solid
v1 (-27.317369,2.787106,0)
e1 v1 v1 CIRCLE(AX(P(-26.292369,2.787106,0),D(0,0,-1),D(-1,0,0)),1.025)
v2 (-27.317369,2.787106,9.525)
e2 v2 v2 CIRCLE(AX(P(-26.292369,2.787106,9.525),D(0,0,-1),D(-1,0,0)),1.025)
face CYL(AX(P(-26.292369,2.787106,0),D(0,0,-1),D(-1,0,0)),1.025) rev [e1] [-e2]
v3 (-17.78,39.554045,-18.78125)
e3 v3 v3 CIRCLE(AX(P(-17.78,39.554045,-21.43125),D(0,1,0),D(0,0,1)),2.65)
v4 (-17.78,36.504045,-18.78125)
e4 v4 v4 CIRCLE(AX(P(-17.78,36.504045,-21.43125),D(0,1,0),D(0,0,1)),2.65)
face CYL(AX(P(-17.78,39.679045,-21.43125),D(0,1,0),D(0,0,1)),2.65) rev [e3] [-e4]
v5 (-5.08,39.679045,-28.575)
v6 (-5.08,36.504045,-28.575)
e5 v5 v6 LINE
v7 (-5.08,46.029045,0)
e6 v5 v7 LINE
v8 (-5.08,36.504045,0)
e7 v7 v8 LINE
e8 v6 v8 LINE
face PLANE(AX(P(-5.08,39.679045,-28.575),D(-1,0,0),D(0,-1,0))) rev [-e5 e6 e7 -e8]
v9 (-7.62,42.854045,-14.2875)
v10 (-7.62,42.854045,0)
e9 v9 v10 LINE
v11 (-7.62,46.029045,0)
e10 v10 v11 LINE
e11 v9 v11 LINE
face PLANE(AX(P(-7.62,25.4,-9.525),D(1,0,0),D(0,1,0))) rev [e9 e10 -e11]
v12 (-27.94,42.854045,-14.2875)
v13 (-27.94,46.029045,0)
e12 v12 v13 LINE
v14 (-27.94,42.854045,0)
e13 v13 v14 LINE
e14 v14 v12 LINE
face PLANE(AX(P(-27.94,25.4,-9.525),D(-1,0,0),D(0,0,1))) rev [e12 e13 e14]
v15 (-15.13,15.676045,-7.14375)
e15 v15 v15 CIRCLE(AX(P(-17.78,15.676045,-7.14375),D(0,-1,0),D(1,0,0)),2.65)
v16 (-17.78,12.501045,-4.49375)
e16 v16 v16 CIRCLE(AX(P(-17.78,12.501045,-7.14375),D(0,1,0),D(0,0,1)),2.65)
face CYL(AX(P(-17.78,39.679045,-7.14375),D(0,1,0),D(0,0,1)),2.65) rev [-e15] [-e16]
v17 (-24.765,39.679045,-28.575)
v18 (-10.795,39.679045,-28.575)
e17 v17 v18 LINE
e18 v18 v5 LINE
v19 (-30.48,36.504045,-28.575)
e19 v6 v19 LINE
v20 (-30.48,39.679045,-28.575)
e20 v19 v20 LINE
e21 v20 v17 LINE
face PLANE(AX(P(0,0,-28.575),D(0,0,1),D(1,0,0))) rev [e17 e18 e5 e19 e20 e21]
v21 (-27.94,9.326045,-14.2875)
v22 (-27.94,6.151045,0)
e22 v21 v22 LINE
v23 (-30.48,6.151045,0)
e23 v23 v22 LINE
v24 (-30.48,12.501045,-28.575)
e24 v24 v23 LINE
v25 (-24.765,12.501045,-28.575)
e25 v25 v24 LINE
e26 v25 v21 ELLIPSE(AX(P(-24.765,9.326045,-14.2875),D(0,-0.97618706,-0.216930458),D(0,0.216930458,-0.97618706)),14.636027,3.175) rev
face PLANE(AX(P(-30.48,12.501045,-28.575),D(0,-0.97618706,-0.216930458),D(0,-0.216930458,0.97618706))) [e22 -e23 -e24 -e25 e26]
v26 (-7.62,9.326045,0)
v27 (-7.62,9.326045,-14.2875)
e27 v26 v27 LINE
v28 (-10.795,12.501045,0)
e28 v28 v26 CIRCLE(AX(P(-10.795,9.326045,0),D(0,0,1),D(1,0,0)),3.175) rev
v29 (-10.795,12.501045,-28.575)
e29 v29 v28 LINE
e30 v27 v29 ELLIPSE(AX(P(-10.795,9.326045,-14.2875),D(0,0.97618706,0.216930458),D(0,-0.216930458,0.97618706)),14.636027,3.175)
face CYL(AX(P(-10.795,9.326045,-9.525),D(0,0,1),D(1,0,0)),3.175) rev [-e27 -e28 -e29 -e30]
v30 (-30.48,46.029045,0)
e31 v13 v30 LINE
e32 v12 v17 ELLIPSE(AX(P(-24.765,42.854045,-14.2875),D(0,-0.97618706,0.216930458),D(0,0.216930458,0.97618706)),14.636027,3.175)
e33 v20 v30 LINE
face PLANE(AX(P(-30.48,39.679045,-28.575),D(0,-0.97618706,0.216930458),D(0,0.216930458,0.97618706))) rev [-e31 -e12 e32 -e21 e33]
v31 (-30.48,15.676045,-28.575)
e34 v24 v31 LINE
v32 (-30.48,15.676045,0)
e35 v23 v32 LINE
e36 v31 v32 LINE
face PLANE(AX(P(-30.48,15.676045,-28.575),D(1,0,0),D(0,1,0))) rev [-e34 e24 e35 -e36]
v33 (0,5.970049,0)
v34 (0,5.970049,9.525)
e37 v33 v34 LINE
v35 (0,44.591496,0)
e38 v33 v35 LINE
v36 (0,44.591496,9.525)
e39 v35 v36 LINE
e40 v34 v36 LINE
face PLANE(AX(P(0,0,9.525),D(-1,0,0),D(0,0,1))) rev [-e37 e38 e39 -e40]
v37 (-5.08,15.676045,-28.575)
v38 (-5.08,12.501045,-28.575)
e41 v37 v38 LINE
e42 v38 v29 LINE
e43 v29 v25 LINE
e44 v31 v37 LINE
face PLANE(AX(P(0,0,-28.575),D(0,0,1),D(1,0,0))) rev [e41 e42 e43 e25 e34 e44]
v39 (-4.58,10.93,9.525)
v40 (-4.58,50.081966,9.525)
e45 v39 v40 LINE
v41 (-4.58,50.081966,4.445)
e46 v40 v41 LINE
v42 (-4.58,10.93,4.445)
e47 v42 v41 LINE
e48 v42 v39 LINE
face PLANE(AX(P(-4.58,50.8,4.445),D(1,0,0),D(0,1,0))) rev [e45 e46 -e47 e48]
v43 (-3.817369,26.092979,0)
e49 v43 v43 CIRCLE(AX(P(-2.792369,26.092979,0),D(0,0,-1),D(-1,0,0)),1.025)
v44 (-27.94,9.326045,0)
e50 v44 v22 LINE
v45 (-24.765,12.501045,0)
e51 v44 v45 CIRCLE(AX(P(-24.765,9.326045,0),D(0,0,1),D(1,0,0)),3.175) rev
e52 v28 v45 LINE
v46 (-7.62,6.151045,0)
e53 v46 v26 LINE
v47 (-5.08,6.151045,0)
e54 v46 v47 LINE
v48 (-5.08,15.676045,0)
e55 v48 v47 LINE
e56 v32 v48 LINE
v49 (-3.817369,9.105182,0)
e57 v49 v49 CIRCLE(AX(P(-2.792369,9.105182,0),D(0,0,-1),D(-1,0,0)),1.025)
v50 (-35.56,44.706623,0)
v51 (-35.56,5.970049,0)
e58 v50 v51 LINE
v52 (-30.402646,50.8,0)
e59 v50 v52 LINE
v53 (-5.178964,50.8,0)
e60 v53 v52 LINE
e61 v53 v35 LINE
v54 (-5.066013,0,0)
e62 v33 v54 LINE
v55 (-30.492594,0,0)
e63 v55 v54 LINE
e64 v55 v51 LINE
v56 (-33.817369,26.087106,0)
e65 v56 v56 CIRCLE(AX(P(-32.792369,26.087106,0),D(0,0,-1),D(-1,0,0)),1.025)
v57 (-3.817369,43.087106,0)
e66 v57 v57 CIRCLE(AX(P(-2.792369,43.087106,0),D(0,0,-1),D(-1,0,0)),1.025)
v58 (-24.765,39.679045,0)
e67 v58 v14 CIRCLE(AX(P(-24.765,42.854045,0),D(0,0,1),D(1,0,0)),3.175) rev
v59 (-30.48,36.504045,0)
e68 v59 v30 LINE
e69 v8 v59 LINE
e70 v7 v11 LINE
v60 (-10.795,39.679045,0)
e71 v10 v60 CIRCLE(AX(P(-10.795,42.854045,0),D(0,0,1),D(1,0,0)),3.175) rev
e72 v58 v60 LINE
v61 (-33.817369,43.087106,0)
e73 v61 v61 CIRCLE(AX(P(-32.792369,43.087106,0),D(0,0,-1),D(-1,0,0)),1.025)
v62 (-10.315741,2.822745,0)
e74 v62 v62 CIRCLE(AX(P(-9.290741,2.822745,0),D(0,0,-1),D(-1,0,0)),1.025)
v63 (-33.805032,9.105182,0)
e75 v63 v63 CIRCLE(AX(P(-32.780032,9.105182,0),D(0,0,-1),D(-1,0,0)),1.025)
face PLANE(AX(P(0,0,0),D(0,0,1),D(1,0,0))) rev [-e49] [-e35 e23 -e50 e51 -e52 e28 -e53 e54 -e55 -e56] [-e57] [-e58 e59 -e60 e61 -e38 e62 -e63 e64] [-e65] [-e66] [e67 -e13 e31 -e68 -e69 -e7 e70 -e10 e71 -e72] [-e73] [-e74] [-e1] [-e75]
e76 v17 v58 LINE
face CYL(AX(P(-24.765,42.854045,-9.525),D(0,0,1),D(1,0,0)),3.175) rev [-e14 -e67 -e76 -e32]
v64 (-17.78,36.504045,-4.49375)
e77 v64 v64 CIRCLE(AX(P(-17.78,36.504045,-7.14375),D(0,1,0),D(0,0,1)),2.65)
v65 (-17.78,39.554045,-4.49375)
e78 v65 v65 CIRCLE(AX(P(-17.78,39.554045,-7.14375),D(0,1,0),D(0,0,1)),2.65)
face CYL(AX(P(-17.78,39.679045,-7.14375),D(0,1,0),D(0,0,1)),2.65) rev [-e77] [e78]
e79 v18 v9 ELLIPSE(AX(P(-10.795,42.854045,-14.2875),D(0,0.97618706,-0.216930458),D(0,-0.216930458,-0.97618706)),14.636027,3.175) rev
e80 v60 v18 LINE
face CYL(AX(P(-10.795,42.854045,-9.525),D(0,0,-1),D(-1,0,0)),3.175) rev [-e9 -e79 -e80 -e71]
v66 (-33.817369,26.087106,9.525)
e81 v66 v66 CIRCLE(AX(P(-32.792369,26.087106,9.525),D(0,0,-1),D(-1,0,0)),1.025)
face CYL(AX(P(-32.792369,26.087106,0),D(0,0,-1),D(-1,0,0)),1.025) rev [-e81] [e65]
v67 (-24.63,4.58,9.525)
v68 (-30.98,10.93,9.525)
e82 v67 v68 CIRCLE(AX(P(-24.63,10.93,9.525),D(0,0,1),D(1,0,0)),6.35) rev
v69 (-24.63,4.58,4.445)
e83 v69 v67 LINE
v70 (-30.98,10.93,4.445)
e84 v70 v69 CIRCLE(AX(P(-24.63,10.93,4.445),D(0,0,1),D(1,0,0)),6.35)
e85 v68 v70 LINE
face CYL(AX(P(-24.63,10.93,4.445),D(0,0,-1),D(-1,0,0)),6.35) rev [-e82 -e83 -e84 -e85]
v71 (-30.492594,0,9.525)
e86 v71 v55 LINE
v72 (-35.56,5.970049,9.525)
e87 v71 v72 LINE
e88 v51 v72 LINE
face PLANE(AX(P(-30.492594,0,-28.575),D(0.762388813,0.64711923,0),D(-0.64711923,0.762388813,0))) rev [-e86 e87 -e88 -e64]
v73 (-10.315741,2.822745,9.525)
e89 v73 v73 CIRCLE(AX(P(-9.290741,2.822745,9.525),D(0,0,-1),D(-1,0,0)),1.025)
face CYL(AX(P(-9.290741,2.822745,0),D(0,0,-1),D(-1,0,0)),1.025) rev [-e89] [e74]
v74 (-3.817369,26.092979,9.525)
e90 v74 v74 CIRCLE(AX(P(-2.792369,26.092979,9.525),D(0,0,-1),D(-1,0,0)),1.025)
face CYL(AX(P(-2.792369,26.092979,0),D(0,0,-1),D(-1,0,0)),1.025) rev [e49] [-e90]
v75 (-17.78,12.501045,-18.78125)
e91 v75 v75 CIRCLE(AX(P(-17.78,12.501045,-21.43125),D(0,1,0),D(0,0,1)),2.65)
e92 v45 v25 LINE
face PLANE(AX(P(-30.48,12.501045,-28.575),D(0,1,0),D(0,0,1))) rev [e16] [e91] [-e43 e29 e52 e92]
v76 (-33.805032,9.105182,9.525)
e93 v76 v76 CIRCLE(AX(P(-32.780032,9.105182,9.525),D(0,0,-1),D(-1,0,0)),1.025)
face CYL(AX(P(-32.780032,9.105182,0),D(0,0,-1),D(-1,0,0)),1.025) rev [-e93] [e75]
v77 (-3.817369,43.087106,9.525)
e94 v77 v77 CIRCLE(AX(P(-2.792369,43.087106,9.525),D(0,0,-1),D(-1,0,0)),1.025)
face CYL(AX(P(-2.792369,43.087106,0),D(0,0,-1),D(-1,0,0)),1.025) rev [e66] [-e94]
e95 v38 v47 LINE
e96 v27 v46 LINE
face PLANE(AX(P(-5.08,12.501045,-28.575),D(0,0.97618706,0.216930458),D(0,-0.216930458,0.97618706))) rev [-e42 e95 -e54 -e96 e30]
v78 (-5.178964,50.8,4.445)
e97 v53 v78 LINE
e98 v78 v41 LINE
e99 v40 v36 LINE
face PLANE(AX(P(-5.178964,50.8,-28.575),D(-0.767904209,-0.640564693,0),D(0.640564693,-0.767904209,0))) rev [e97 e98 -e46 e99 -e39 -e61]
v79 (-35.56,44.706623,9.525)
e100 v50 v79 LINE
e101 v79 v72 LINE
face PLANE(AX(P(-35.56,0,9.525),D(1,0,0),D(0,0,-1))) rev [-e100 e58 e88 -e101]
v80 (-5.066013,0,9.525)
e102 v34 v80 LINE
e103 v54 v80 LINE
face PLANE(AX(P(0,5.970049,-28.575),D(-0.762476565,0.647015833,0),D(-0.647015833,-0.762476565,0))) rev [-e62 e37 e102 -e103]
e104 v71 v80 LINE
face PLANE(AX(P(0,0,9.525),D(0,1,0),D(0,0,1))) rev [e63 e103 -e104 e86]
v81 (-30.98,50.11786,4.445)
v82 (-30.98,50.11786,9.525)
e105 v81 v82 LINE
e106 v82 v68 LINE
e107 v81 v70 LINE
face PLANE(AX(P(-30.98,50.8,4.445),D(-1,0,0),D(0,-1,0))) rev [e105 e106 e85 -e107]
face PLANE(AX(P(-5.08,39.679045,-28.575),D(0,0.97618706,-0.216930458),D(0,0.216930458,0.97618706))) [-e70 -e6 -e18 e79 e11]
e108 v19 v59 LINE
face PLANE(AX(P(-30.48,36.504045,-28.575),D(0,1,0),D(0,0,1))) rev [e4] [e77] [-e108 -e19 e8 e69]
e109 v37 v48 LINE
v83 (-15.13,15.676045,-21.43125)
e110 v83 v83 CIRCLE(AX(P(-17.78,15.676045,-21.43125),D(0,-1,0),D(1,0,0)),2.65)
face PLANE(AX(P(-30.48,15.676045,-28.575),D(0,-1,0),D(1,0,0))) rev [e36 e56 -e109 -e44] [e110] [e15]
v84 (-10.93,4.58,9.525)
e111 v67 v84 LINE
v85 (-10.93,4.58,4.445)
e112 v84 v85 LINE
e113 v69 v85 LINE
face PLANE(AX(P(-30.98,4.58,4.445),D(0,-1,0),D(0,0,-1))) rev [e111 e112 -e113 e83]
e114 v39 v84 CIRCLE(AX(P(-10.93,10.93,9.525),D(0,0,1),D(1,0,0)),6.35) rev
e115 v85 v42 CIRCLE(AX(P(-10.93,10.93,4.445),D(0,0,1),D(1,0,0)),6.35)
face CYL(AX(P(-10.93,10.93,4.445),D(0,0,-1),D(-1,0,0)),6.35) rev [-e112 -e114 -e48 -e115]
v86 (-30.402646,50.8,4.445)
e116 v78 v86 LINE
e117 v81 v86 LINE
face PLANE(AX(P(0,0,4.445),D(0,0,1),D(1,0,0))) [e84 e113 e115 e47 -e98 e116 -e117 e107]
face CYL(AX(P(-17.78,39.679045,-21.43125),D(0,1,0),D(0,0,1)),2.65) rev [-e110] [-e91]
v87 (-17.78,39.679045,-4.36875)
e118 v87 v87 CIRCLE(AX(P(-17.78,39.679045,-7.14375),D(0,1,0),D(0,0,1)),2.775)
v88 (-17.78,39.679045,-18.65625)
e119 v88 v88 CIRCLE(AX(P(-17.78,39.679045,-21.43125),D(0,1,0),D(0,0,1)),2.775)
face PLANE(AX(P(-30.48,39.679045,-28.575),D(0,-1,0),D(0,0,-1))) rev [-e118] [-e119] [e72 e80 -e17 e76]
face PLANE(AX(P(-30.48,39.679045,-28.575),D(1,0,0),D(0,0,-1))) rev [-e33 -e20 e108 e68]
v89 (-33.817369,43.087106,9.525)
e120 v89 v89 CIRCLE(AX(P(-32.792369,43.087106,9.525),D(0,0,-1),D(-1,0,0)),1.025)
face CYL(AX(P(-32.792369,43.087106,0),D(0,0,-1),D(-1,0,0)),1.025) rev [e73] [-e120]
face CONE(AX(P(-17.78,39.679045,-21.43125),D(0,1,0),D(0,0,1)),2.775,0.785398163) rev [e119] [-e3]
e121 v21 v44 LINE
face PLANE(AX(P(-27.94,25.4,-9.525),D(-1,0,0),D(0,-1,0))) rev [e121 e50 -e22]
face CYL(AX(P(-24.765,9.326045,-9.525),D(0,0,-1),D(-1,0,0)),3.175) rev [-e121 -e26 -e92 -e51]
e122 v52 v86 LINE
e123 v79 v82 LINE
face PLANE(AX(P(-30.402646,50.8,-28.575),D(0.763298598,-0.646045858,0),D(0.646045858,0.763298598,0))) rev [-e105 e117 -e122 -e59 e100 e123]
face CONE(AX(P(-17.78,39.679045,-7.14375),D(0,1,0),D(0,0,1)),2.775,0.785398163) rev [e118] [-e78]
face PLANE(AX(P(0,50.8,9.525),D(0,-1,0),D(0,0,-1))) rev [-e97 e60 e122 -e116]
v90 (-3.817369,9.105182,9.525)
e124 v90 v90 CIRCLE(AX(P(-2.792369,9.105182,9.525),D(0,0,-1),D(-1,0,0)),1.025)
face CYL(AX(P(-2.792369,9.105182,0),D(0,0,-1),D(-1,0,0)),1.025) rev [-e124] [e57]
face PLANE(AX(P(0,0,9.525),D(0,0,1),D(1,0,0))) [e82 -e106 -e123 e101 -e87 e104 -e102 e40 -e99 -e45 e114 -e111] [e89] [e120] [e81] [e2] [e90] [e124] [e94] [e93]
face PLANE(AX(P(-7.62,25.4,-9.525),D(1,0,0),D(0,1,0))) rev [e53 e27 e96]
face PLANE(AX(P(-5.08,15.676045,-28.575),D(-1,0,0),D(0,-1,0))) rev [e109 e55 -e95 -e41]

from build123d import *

# Parameters (mm, degrees)
SKETCH1_W                      = 35.56
SKETCH1_H                      = 50.8
BOSS_EXTRUDE1_DEPTH            = 9.525
SKETCH2_W                      = 26.4
SKETCH2_H                      = 46.22
CUT_EXTRUDE2_DEPTH             = 5.08
TAP_DRILL_FOR_M2_5X0_45_TAP1_D = 2.05
SKETCH13_W                     = 25.4
SKETCH13_H                     = 3.175
BOSS_EXTRUDE2_DEPTH            = 28.575
CUT_EXTRUDE3_DEPTH             = 73.778867812
FILLET1_R                      = 6.35
M5_CLEARANCE_HOLE1_D           = 5.3
M5_CLEARANCE_HOLE1_CSINK_D     = 5.55
M5_CLEARANCE_HOLE1_CSINK_ANGLE = 90
RIB7_REACH                     = 67.774
SKETCH14_WALL_W                = 162.819779212
SKETCH14_WALL_H                = 2.54
RIB8_REACH                     = 67.774
SKETCH15_WALL_W                = 162.819779212
SKETCH15_WALL_H                = 2.54
RIB9_REACH                     = 67.774
SKETCH17_WALL_W                = 162.819779212
SKETCH17_WALL_H                = 2.54
RIB10_REACH                    = 67.774
SKETCH16_WALL_W                = 162.819779212
SKETCH16_WALL_H                = 2.54
FILLET2_R                      = 3.175
FILLET3_R                      = 3.175


with BuildPart() as part:
    # Sketch1 → Boss-Extrude1 (new body)
    with BuildSketch(Plane.XY):
        with Locations((-17.78, 25.4)):
            Rectangle(SKETCH1_W, SKETCH1_H)
    extrude(amount=BOSS_EXTRUDE1_DEPTH)

    # Sketch2 → Cut-Extrude2 (cut)
    with BuildSketch(Plane.XY.offset(9.525)):
        with Locations((-17.78, 27.69)):
            Rectangle(SKETCH2_W, SKETCH2_H)
    extrude(amount=-CUT_EXTRUDE2_DEPTH, mode=Mode.SUBTRACT)

    # Tap Drill for M2.5x0.45 Tap1 (through all)
    with Locations(Plane(origin=(0, 0, 0), x_dir=(-1, 0, 0), z_dir=(0, 0, -1))):
        with Locations((2.792369004, 43.087106138), (2.792369004, 26.092979092), (2.792369004, 9.105182099), (9.290740849, 2.822744672), (26.292369004, 2.787106138), (32.780032006, 9.105182099), (32.792369004, 26.087106138), (32.792369004, 43.087106138)):
            Hole(TAP_DRILL_FOR_M2_5X0_45_TAP1_D / 2)

    # Sketch13 → Boss-Extrude2 (add)
    with BuildSketch(Plane(origin=(0, 0, 0), x_dir=(-1, 0, 0), z_dir=(0, 0, -1))):
        with Locations((17.78, 38.091545037)):
            Rectangle(SKETCH13_W, SKETCH13_H)
        with Locations((17.78, 14.088545037)):
            Rectangle(SKETCH13_W, SKETCH13_H)
    extrude(amount=BOSS_EXTRUDE2_DEPTH)

    # Sketch8 → Cut-Extrude3 (cut, through all)
    with BuildSketch(Plane.XY.offset(9.525)):
        Polygon((-5.178964387, 50.8), (0, 44.591495864), (0, 50.8), align=None)
        Polygon((-35.56, 44.706622517), (-35.56, 50.8), (-30.402645731, 50.8), align=None)
        Polygon((-35.56, 5.970049098), (-35.56, 0), (-30.492594088, 0), align=None)
        Polygon((-5.092594088, -0.031324356), (0, 0), (0, 5.970049098), align=None)
    extrude(amount=-CUT_EXTRUDE3_DEPTH, mode=Mode.SUBTRACT)

    # Fillet1
    fillet1_edges = [part.edges().sort_by_distance(p)[0] for p in [
        (-4.58, 4.58, 6.985),
        (-30.98, 4.58, 6.985),
    ]]
    fillet(fillet1_edges, radius=FILLET1_R)

    # M5 Clearance Hole1 (through all)
    with Locations(Plane(origin=(-17.78, 39.679045037, -7.14375), x_dir=(0, 0, 1), z_dir=(0, 1, 0))):
        with Locations((0, 0), (-14.2875, 0)):
            CounterSinkHole(M5_CLEARANCE_HOLE1_D / 2, M5_CLEARANCE_HOLE1_CSINK_D / 2, counter_sink_angle=M5_CLEARANCE_HOLE1_CSINK_ANGLE)

    # Sketch14 wall → Rib7 (add, up to next)
    with BuildSketch(Plane(origin=(-30.48, 9.326045037, -14.2875), x_dir=(0, -0.216930457819, 0.976187060184), z_dir=(0, 0.976187060184, 0.216930457819)), mode=Mode.PRIVATE) as rib7_sk1:
        with Locations((0, 1.27)):
            Rectangle(SKETCH14_WALL_W, SKETCH14_WALL_H)
    rib7_tool1 = extrude(rib7_sk1.sketch, amount=RIB7_REACH, mode=Mode.PRIVATE) - part.part
    add(rib7_tool1.solids().sort_by_distance((-30.48, 9.326045037, -14.2875))[0])

    # Sketch15 wall → Rib8 (add, up to next)
    with BuildSketch(Plane(origin=(-5.08, 9.326045037, -14.2875), x_dir=(0, -0.216930457819, 0.976187060184), z_dir=(0, -0.976187060184, -0.216930457819)), mode=Mode.PRIVATE) as rib8_sk1:
        with Locations((0, 1.27)):
            Rectangle(SKETCH15_WALL_W, SKETCH15_WALL_H)
    rib8_tool1 = extrude(rib8_sk1.sketch, amount=-RIB8_REACH, mode=Mode.PRIVATE) - part.part
    add(rib8_tool1.solids().sort_by_distance((-5.08, 9.326045037, -14.2875))[0])

    # Sketch17 wall → Rib9 (add, up to next)
    with BuildSketch(Plane(origin=(-5.08, 42.854045037, -14.2875), x_dir=(0, 0.216930457819, 0.976187060184), z_dir=(0, -0.976187060184, 0.216930457819)), mode=Mode.PRIVATE) as rib9_sk1:
        with Locations((0, 1.27)):
            Rectangle(SKETCH17_WALL_W, SKETCH17_WALL_H)
    rib9_tool1 = extrude(rib9_sk1.sketch, amount=RIB9_REACH, mode=Mode.PRIVATE) - part.part
    add(rib9_tool1.solids().sort_by_distance((-5.08, 42.854045037, -14.2875))[0])

    # Sketch16 wall → Rib10 (add, up to next)
    with BuildSketch(Plane(origin=(-30.48, 42.854045037, -14.2875), x_dir=(0, 0.216930457819, 0.976187060184), z_dir=(0, 0.976187060184, -0.216930457819)), mode=Mode.PRIVATE) as rib10_sk1:
        with Locations((0, 1.27)):
            Rectangle(SKETCH16_WALL_W, SKETCH16_WALL_H)
    rib10_tool1 = extrude(rib10_sk1.sketch, amount=-RIB10_REACH, mode=Mode.PRIVATE) - part.part
    add(rib10_tool1.solids().sort_by_distance((-30.48, 42.854045037, -14.2875))[0])

    # Fillet2
    fillet2_edges = [part.edges().sort_by_distance(p)[0] for p in [
        (-27.94, 12.501045037, -14.2875),
        (-7.62, 12.501045037, -14.2875),
    ]]
    fillet(fillet2_edges, radius=FILLET2_R)

    # Fillet3
    fillet3_edges = [part.edges().sort_by_distance(p)[0] for p in [
        (-7.62, 39.679045037, -14.2875),
        (-27.94, 39.679045037, -14.2875),
    ]]
    fillet(fillet3_edges, radius=FILLET3_R)


solid = part.part
